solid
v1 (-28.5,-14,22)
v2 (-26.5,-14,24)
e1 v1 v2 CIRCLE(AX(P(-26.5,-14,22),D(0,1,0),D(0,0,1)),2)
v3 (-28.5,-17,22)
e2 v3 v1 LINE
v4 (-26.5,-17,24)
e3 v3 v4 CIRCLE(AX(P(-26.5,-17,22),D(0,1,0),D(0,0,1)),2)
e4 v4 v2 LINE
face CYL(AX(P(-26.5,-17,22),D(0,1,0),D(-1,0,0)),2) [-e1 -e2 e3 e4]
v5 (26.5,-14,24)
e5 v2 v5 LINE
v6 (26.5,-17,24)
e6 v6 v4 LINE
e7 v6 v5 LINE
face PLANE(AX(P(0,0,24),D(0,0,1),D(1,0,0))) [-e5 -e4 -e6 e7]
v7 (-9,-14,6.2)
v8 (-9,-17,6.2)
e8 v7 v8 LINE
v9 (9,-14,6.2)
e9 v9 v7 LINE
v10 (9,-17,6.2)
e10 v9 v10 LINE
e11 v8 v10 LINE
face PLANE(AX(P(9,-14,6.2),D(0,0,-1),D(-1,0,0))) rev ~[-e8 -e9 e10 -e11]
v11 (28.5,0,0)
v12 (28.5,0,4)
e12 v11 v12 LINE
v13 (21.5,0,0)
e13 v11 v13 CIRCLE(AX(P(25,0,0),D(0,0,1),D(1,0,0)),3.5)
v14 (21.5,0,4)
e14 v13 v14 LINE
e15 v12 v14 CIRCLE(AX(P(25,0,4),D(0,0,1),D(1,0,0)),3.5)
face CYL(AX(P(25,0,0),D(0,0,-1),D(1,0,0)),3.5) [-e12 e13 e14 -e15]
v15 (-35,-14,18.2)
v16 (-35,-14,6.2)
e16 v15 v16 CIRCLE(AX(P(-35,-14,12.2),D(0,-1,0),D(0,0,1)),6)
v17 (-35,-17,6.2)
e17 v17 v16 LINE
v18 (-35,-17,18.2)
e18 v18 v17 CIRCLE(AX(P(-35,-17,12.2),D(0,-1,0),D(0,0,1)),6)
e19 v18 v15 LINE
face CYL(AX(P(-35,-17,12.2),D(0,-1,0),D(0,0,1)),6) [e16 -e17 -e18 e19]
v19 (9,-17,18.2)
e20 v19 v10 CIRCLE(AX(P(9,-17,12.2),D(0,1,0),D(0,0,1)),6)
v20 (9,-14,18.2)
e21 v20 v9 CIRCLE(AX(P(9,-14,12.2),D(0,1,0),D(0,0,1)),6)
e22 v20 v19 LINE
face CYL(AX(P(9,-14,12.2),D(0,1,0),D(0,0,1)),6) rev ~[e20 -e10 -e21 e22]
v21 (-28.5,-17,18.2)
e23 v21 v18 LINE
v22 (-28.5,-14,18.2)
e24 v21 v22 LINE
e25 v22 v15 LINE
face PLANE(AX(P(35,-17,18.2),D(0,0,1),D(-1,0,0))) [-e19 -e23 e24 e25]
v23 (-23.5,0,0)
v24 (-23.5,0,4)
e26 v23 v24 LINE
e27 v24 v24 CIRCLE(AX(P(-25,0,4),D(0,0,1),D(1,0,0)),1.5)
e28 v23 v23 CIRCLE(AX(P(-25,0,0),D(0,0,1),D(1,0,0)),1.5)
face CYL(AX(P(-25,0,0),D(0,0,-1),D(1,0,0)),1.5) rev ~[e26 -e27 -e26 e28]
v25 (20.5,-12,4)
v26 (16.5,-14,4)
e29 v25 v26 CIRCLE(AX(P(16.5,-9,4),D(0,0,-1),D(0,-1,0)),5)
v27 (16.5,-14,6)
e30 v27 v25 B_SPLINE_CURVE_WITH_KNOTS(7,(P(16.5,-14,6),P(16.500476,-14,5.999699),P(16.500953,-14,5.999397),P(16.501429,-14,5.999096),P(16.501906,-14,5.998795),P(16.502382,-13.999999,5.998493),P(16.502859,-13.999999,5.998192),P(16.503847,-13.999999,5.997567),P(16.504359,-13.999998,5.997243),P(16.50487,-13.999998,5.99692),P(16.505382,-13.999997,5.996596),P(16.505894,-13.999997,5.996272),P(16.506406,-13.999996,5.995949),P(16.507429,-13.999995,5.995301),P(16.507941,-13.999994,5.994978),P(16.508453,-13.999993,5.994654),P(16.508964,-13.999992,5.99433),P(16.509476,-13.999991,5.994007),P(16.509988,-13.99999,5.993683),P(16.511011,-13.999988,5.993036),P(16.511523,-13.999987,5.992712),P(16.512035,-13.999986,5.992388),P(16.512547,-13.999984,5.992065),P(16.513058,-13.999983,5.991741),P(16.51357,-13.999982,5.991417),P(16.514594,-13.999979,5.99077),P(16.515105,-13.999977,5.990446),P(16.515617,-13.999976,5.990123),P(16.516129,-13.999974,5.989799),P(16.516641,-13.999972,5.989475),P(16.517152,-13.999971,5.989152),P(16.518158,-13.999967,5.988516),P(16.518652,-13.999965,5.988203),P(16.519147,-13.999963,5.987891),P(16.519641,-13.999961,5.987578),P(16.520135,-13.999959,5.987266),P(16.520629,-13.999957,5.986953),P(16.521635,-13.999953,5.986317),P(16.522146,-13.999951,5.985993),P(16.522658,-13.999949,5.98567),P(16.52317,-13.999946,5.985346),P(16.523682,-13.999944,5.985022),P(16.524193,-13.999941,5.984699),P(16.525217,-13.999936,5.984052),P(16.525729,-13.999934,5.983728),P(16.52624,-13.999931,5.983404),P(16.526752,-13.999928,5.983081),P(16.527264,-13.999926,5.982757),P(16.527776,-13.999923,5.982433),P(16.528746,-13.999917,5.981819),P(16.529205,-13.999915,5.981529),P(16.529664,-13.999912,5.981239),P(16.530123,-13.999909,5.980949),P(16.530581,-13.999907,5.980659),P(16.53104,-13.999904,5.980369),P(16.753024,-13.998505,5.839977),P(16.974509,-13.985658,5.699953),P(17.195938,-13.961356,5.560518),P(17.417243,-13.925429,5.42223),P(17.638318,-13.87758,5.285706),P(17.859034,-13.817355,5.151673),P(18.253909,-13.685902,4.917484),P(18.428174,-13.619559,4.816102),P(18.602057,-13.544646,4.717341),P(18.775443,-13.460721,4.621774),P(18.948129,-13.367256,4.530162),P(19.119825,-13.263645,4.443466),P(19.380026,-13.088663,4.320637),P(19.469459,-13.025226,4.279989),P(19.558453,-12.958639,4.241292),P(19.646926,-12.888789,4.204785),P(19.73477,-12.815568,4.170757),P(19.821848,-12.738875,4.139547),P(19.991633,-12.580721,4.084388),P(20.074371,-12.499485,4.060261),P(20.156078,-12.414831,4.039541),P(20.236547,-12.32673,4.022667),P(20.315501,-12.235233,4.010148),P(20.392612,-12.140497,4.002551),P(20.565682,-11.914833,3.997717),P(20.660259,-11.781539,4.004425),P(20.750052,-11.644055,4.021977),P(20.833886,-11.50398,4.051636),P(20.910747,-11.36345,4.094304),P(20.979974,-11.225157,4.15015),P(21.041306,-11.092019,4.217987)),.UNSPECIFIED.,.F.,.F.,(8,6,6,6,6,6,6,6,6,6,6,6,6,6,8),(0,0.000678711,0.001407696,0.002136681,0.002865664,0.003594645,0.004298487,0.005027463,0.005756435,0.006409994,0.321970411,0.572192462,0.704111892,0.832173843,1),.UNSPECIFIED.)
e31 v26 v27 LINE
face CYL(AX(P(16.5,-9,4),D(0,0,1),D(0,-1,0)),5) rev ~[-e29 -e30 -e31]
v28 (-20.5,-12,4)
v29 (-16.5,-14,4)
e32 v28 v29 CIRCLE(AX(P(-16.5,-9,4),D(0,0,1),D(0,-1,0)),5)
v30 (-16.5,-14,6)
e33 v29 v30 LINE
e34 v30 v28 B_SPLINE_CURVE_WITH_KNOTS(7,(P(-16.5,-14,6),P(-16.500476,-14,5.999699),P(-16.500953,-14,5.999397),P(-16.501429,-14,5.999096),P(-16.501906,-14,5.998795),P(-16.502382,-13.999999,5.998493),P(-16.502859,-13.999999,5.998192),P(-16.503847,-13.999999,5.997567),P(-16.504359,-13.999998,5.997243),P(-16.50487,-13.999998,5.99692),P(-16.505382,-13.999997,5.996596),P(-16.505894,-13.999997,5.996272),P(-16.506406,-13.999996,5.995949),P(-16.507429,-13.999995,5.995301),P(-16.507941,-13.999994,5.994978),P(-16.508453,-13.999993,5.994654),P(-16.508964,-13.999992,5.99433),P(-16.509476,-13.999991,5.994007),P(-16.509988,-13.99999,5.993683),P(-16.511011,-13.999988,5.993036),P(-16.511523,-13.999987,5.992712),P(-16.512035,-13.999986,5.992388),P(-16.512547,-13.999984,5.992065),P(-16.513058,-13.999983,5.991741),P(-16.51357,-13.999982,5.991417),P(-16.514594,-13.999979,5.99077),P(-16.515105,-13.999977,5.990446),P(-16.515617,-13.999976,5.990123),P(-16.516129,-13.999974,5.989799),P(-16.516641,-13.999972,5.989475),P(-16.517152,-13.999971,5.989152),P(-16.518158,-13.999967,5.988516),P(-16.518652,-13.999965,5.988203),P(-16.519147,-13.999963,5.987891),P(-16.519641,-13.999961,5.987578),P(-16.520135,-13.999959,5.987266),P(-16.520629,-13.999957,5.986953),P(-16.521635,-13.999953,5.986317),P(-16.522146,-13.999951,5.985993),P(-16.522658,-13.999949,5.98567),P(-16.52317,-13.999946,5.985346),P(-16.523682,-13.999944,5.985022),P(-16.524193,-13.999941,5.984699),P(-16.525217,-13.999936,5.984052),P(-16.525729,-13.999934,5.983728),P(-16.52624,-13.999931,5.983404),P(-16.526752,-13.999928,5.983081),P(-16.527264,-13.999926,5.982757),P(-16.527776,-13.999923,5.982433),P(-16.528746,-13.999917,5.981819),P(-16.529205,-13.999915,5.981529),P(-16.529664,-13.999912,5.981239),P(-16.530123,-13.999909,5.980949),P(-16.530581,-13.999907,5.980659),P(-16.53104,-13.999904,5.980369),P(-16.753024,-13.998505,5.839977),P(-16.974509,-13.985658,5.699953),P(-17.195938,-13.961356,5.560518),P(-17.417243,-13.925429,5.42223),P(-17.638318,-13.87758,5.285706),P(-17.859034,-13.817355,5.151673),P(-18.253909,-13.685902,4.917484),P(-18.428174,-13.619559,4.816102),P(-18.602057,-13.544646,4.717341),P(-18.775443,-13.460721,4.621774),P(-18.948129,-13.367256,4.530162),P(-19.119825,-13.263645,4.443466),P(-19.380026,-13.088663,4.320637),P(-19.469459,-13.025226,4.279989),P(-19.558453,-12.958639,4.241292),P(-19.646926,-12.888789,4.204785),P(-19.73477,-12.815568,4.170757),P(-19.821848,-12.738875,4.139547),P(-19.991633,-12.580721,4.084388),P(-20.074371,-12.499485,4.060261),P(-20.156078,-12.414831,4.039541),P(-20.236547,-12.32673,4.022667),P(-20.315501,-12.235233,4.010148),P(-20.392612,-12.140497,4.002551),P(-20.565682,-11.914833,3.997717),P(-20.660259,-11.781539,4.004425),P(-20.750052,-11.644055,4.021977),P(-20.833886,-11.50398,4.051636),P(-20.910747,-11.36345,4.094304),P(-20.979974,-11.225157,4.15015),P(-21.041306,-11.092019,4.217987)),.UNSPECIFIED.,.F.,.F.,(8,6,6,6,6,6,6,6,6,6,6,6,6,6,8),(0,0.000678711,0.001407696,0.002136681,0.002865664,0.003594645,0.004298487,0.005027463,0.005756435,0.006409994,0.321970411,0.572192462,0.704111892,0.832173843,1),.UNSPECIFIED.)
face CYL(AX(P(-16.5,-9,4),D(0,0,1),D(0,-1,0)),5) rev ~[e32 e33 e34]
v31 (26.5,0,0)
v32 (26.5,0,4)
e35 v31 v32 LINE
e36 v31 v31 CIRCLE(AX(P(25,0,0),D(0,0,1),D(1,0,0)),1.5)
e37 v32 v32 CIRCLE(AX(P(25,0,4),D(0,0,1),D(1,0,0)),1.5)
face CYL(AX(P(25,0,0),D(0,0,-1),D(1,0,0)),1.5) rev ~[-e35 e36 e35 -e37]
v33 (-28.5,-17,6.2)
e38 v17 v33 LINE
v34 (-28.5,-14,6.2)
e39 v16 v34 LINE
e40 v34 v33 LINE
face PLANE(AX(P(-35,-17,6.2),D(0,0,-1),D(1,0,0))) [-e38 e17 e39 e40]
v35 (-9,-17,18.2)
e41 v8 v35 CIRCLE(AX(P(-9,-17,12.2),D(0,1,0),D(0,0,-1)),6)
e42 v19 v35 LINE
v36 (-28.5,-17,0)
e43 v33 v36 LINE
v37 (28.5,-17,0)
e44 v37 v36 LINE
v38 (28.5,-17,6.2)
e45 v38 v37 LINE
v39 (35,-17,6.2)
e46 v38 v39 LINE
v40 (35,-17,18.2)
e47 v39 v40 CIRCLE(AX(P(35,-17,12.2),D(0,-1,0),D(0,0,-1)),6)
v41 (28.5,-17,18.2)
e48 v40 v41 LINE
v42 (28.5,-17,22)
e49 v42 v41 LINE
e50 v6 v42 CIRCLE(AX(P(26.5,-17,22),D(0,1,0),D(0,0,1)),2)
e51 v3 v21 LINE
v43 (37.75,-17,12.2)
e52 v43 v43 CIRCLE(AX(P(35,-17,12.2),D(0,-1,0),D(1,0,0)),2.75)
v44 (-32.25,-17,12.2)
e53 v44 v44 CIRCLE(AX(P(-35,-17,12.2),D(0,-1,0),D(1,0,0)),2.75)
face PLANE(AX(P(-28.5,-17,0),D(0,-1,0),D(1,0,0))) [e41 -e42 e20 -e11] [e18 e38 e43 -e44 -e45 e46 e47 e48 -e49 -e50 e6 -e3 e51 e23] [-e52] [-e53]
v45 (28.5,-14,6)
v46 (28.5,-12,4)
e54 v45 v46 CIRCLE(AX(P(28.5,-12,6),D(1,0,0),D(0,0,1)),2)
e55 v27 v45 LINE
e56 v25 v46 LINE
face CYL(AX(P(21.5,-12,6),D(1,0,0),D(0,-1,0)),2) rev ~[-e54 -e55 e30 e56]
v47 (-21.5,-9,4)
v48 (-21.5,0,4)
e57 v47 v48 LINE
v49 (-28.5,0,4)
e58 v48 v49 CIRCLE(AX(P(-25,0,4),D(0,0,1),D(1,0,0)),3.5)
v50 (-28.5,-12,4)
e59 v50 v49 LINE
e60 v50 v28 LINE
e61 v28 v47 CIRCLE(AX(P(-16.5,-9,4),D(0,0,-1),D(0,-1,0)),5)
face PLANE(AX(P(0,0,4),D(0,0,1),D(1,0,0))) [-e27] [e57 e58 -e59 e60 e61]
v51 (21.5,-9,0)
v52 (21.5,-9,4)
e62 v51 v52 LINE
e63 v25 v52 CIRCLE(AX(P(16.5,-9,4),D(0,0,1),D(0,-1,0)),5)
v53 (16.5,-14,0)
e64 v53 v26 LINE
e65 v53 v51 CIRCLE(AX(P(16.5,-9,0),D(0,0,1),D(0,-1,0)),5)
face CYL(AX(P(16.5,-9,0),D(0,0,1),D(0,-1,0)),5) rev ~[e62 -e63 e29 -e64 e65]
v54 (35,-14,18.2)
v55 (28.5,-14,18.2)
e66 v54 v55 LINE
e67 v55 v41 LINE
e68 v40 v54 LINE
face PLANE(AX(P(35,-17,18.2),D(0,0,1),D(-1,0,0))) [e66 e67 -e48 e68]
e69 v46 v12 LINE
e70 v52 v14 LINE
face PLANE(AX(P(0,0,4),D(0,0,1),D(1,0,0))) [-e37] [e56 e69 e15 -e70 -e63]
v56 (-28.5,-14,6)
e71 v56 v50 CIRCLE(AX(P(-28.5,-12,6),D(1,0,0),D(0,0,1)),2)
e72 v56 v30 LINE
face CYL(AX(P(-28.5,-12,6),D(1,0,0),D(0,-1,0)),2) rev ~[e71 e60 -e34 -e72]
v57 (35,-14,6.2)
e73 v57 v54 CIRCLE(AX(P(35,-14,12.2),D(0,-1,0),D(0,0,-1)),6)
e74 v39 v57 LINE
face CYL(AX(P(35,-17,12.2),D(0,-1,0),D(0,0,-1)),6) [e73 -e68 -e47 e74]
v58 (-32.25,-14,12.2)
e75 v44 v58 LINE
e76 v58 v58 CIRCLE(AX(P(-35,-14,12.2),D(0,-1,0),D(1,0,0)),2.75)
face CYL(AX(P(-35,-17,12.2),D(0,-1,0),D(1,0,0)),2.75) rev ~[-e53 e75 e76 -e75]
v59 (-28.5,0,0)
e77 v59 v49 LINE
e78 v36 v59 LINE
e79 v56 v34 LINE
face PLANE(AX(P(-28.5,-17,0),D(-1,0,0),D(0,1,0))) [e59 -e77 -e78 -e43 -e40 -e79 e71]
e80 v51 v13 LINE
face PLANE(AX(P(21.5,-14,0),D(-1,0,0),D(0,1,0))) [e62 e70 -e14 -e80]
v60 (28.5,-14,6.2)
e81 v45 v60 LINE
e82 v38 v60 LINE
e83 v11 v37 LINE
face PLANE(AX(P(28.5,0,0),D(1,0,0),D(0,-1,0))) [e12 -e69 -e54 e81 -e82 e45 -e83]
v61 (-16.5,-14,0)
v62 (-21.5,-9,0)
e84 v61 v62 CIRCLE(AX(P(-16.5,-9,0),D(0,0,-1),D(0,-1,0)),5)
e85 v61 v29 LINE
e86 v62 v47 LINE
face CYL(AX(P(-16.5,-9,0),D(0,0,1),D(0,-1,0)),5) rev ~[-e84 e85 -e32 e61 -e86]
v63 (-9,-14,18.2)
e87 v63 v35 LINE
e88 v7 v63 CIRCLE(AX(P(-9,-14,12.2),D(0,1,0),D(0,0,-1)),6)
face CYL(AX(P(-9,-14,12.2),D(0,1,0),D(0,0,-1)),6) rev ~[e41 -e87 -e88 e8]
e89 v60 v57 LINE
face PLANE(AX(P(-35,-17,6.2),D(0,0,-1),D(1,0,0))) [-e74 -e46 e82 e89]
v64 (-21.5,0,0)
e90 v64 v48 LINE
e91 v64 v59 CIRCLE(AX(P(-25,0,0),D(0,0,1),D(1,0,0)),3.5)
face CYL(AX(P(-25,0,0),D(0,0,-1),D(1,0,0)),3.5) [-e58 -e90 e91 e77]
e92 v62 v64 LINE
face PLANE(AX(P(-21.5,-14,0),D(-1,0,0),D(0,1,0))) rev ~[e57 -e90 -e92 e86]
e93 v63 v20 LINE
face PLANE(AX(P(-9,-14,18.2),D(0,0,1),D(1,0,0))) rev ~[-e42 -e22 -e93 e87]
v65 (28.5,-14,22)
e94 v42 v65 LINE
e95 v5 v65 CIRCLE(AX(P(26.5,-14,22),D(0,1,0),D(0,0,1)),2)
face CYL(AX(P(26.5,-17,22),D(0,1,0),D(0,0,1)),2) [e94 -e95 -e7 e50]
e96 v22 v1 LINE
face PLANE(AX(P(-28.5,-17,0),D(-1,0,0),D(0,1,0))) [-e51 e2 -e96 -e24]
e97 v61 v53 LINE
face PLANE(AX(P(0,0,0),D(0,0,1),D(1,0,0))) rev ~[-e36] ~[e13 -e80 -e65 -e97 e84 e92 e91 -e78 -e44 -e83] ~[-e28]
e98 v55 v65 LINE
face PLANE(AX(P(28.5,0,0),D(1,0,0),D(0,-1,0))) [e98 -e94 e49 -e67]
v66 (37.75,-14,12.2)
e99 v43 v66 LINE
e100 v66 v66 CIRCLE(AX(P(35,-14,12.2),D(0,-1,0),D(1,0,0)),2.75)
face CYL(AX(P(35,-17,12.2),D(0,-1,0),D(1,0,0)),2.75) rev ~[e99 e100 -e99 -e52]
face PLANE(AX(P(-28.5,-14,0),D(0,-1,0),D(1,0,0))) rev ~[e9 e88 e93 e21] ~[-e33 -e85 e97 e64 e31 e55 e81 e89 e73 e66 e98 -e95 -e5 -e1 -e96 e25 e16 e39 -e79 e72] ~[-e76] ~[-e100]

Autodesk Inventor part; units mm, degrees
ref_plane "YZ Plane" through (0, 0, 0) normal (1, 0, 0) x (0, 1, 0)
ref_plane "XZ Plane" through (0, 0, 0) normal (0, 1, 0) x (-1, 0, 0)
ref_plane "XY Plane" through (0, 0, 0) normal (0, 0, 1) x (1, 0, 0)
sketch "Sketch1" plane through (0, 0, 0) normal (0, 0, 1) x (1, 0, 0)
  line L0 (0, 0) -> (-25, 0) construction
  line L1 (0, 0) -> (25, 0) construction
  circle A0 centre (-25, 0) radius 1.5
  circle A1 centre (25, 0) radius 1.5
  line L2 (-21.5, -14) -> (21.5, -14)
  line L3 (28.5, -11.1976) -> (28.5, -17)
  line L4 (28.5, -17) -> (-28.5, -17)
  line L5 (-28.5, -17) -> (-28.5, 0.6332)
  line L6 (-21.5, -14) -> (-21.5, 0)
  line L7 (-28.5, 0) -> (-28.5, 0.6332)
  line L8 (21.5, -14) -> (21.5, 0)
  line L9 (28.5, 0) -> (28.5, -11.1976)
  arc A2 (28.5, 0) -> (21.5, 0) centre (25, 0) ccw
  arc A3 (-21.5, 0) -> (-28.5, 0) centre (-25, 0) ccw
  dimension "d0" = 50
  dimension "d1" = 3
  dimension "d2" = 3.5
  dimension "d3" = 17
  dimension "d4" = 3
extrude "Extrusion1" add sketch "Sketch1" along normal blind 4
sketch "Sketch2" plane through (0, 0, 4) normal (0, 0, 1) x (1, 0, 0)
  line L0 (28.5, -17) -> (28.5, 0) projected
  line L1 (28.5, -17) -> (-28.5, -17)
  line L2 (-28.5, -17) -> (-28.5, -14)
  line L3 (-28.5, -14) -> (28.5, -14)
  line L4 (28.5, -14) -> (28.5, -17)
  line L5 (-28.5, 0) -> (-28.5, -17) projected
  point P0 (0, 0)
  point P1 (-21.5, -14)
extrude "Extrusion2" add sketch "Sketch2" along normal blind 20
sketch "Sketch3" plane through (-28.5, -17, 0) normal (0, -1, 0) x (1, 0, 0)
  line L0 (28.5, 0) -> (28.5, 12.2) construction
  line L1 (-6.5, 12.2) -> (63.5, 12.2) construction
  line L2 (0, 24) -> (57, 24) projected
  line L3 (-6.5, 6.2) -> (63.5, 6.2)
  line L4 (63.5, 18.2) -> (-6.5, 18.2)
  arc A0 (-6.5, 18.2) -> (-6.5, 6.2) centre (-6.5, 12.2) ccw
  arc A1 (63.5, 6.2) -> (63.5, 18.2) centre (63.5, 12.2) ccw
  line L5 (0, 4) -> (7, 4) projected
  circle A2 centre (-6.5, 12.2) radius 2.75
  circle A3 centre (63.5, 12.2) radius 2.75
  dimension "d9" = 6
  dimension "d10" = 70
  dimension "d11" = 8.2
  dimension "d12" = 5.5
extrude "Extrusion3" add sketch "Sketch3" against normal up to surface (3 mm away)
sketch "Sketch4" plane through (-21.5, -14, 0) normal (0, 1, 0) x (1, 0, 0)
  circle A0 centre (-13.5, -12.2) radius 2.75 construction
  line L0 (-13.5, -12.2) -> (21.5, -12.2) construction
  line L1 (21.5, -12.2) -> (21.5, 0) construction
  line L2 (-7, 0) -> (50, 0) construction
  line L3 (30.5, -12.2) -> (12.5, -12.2) construction
  line L4 (30.5, -6.2) -> (12.5, -6.2)
  line L5 (12.5, -18.2) -> (30.5, -18.2)
  arc A1 (30.5, -18.2) -> (30.5, -6.2) centre (30.5, -12.2) ccw
  arc A2 (12.5, -6.2) -> (12.5, -18.2) centre (12.5, -12.2) ccw
  dimension "d15" = 6
  dimension "d16" = 18
extrude "Extrusion4" cut sketch "Sketch4" against normal through all
fillet "Fillet1" radius 2 2 edges at (-28.5, -15.5, 24) (28.5, -15.5, 24)
fillet "Fillet2" radius 2 2 edges at (-25, -14, 4) (25, -14, 4)
fillet "Fillet3" radius 5 4 edges at (-21.5, -14, 5) (-21.5, -14, 2) (21.5, -14, 2) (21.5, -14, 5)
properties part number "IntegzaBracket"
